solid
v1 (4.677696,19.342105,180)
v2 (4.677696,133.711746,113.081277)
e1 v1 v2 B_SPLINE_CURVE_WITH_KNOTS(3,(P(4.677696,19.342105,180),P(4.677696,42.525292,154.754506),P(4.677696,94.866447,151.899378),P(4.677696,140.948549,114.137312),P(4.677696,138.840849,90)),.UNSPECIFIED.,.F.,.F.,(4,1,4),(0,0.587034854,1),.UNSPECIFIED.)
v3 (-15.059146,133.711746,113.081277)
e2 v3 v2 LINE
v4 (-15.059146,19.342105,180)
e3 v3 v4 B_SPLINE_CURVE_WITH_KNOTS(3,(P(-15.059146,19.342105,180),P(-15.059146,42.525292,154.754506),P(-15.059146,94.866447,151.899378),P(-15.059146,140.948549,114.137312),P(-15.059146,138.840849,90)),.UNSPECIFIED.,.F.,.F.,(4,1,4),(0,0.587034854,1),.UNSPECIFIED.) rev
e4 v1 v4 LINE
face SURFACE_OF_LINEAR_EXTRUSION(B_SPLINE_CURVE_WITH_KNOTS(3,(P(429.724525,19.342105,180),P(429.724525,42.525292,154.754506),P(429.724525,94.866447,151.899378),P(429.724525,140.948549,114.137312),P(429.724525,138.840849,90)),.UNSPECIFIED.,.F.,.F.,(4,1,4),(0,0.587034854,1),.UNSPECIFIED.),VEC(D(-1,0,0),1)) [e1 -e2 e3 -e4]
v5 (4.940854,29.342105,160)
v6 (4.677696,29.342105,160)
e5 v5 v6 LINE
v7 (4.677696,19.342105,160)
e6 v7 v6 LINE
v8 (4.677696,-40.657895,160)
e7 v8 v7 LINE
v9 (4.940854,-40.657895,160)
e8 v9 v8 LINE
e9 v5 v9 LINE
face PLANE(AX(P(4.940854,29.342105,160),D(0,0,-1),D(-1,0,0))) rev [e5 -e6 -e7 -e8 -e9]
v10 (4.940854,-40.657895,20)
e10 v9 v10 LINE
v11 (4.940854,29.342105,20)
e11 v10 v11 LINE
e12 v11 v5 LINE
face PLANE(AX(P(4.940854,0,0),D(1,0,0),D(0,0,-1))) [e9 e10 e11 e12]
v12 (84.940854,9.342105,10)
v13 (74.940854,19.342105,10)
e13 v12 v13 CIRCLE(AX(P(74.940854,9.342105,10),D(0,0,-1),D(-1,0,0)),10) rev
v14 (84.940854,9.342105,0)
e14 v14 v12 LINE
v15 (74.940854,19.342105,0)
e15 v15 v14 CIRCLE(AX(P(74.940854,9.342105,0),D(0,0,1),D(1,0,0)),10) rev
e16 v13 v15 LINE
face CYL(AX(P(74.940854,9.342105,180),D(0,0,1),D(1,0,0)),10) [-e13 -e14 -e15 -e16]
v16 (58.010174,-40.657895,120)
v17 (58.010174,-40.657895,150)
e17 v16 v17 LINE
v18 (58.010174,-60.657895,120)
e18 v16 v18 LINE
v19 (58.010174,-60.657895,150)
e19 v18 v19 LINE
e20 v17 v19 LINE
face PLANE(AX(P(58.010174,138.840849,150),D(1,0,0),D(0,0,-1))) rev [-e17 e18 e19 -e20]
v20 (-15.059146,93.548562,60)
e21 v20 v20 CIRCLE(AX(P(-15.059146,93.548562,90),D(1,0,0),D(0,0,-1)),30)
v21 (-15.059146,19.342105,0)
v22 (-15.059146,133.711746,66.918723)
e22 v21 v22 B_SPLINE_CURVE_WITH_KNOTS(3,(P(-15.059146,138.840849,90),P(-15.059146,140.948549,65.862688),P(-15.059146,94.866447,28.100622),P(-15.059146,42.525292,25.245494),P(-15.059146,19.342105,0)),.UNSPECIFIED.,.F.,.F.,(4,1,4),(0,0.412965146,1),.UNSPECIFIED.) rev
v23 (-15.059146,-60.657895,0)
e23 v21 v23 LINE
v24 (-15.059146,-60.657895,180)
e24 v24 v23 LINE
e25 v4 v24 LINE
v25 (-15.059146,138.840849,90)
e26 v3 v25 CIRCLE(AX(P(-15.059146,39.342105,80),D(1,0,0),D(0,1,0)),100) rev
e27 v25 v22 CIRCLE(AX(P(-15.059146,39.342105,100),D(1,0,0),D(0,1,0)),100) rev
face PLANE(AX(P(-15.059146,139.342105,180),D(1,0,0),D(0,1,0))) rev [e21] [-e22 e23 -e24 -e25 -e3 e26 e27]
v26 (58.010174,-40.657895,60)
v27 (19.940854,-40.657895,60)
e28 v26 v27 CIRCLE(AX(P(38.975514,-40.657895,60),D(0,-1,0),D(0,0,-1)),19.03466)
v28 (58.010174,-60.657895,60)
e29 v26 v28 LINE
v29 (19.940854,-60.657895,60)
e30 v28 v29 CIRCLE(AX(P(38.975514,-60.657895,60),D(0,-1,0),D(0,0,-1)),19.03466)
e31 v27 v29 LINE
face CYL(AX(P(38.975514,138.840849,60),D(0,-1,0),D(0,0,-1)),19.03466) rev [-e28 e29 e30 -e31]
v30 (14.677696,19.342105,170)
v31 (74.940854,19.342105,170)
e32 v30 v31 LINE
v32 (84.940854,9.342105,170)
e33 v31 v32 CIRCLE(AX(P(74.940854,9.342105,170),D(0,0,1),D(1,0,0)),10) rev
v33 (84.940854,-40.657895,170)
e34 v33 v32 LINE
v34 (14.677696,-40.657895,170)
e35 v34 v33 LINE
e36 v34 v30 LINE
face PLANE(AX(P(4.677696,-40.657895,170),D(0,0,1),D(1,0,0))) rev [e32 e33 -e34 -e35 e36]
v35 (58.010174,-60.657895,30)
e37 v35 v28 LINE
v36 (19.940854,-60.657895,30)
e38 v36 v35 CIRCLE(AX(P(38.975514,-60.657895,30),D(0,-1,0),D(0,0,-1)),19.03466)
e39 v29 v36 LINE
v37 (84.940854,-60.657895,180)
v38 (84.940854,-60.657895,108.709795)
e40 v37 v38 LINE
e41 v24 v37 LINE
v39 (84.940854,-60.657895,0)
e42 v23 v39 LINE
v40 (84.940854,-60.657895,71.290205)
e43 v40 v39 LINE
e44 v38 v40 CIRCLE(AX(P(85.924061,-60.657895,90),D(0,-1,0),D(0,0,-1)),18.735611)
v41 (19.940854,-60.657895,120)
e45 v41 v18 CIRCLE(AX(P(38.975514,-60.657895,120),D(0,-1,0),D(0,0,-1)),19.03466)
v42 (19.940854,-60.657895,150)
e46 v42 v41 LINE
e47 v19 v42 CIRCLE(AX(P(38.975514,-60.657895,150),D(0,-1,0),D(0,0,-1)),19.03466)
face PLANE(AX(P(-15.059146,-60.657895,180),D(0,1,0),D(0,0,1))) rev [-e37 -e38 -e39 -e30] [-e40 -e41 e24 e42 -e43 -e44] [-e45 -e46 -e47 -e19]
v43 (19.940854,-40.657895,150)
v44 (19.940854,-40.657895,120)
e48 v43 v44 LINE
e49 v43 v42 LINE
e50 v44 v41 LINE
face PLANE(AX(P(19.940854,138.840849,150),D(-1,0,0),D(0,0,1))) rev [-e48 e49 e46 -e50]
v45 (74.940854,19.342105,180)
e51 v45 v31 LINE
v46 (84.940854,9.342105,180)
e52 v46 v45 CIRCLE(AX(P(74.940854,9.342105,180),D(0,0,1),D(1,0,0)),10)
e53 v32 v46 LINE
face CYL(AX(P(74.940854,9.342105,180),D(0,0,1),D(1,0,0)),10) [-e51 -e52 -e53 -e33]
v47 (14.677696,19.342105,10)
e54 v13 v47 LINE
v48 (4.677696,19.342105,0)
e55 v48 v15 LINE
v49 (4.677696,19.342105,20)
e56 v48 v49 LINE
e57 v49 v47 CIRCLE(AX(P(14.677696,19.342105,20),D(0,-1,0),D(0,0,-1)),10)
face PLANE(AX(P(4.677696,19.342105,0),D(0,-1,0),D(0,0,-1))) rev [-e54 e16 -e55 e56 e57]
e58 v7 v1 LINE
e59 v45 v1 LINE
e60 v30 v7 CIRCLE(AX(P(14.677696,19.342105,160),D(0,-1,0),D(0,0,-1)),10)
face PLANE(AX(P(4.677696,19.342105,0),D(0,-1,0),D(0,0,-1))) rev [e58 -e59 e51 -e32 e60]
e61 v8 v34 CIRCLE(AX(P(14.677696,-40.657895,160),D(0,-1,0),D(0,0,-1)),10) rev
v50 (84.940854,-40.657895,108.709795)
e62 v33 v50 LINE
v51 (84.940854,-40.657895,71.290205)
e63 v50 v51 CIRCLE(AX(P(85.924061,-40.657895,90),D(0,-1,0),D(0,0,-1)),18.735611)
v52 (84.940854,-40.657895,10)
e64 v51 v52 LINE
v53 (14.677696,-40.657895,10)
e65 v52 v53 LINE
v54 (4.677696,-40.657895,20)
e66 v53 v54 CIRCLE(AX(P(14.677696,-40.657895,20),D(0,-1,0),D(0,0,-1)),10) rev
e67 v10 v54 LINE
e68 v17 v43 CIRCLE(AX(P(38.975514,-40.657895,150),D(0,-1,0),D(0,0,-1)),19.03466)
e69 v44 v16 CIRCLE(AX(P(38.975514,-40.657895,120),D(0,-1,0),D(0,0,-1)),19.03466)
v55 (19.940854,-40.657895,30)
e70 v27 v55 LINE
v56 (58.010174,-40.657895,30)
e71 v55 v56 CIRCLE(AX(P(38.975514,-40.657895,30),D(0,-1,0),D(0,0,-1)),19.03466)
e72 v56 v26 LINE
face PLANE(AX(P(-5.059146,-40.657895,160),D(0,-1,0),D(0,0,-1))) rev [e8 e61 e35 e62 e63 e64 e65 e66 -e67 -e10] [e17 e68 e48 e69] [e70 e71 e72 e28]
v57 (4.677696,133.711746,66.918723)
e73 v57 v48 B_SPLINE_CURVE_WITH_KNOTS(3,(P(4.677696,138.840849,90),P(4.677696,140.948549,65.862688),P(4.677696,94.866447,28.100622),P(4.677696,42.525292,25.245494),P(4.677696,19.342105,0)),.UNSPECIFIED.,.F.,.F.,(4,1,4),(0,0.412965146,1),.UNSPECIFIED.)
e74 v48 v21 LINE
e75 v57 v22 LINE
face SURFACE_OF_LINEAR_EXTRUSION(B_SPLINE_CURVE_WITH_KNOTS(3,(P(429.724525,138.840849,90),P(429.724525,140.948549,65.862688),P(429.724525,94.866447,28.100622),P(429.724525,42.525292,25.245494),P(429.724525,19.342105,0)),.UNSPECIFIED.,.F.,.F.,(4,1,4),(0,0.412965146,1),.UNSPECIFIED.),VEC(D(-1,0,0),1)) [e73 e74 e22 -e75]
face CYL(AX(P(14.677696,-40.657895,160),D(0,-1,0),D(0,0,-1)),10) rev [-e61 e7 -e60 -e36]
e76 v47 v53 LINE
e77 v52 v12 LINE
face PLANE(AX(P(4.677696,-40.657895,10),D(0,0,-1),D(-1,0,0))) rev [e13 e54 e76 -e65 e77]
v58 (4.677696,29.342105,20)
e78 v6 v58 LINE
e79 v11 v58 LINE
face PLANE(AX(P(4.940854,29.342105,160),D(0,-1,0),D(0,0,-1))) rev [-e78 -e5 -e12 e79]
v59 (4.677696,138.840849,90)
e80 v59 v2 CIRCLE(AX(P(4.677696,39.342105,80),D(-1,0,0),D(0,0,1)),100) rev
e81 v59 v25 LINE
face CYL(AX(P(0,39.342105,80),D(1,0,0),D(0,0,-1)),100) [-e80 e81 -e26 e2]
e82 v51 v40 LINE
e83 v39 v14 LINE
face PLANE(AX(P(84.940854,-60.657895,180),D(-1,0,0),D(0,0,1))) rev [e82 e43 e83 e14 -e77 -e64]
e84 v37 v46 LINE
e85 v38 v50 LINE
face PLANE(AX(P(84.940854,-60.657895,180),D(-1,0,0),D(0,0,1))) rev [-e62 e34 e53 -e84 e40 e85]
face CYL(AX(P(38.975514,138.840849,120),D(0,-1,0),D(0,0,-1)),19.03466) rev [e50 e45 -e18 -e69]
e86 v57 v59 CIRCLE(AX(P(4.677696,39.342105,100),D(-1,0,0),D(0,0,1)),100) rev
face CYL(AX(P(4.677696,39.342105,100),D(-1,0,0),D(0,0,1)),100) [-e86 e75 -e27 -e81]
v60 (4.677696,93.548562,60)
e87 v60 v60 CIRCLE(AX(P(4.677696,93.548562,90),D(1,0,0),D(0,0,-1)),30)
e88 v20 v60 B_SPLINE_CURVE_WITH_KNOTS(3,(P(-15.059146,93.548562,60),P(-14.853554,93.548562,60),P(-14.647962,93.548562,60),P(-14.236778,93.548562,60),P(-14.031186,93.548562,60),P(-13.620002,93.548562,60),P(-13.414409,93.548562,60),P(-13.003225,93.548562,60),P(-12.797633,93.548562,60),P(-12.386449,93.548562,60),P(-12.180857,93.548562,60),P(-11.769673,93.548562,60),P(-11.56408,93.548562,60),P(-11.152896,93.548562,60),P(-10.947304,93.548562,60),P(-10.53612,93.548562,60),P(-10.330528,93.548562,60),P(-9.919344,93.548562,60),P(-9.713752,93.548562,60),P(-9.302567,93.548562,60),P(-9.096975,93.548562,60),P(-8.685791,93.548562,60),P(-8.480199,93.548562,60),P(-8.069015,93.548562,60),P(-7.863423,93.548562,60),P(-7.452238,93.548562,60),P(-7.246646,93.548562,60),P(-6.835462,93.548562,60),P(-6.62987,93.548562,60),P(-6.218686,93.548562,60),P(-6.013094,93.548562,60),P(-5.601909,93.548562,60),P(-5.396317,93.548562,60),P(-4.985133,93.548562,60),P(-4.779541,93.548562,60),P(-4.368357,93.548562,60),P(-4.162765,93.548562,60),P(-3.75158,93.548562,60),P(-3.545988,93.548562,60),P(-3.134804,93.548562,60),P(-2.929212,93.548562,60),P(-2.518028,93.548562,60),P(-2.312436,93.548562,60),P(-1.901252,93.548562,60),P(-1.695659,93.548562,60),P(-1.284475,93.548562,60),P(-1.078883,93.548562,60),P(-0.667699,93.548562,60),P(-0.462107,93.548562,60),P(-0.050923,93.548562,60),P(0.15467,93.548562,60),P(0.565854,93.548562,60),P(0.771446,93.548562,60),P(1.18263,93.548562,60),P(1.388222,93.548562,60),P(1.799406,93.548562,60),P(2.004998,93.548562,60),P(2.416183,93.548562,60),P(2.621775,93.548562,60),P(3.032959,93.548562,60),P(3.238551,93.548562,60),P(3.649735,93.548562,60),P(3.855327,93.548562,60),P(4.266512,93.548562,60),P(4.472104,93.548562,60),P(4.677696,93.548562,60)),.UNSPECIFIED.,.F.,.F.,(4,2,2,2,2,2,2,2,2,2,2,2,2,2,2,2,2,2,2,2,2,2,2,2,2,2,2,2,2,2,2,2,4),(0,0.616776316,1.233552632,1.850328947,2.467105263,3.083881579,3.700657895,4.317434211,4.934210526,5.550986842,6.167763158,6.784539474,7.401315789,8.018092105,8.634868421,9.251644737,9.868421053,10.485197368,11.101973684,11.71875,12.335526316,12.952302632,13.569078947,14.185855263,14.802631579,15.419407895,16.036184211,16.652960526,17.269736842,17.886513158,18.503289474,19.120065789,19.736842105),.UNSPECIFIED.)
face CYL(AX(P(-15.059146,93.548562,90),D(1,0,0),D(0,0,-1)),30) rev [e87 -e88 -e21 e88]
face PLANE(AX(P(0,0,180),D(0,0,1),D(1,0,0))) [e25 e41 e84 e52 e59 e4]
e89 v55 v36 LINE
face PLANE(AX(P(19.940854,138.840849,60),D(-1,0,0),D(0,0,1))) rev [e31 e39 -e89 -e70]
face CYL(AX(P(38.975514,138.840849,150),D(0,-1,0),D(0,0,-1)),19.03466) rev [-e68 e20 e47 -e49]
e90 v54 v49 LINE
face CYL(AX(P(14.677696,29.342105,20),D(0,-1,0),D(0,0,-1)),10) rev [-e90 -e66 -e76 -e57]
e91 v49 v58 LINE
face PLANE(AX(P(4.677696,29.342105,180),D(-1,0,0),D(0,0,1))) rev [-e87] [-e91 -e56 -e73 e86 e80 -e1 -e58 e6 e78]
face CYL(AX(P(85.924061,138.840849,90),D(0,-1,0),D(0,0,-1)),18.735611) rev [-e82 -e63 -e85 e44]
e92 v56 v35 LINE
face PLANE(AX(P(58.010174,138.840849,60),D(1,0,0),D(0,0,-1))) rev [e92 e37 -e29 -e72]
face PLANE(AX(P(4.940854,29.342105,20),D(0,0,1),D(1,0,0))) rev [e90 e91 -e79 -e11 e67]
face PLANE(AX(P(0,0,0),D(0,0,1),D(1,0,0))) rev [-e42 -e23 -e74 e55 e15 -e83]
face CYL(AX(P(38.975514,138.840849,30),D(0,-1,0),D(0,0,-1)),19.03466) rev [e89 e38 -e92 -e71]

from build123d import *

# Parameters (mm, degrees)
SALIENTE_EXTRUIR1_DEPTH     = 180
REDONDEO1_R                 = 100
REDONDEO2_R                 = 10
CROQUIS2_W                  = 140
CROQUIS2_H                  = 70
CORTAR_EXTRUIR4_DEPTH       = 90
CROQUIS3_R                  = 30
CORTAR_EXTRUIR5_DEPTH       = 242.078733734
CORTAR_EXTRUIR6_DEPTH       = 282.806134391
CROQUIS5_W                  = 80.263157895
CROQUIS5_H                  = 10
CORTAR_EXTRUIR8_DEPTH       = 70
CROQUIS6_W                  = 80.263157895
CROQUIS6_H                  = 10
CORTAR_EXTRUIR9_DEPTH       = 243.676183384
REDONDEO8_R                 = 10
CORTAR_EXTRUIR10_DEPTH      = 242.078733734
CORTAR_EXTRUIR10_DEPTH_BACK = 242.078733734
CROQUIS8_W                  = 140
CROQUIS8_H                  = 70
SALIENTE_EXTRUIR2_DEPTH     = 10
CROQUIS9_R                  = 18.735611047
CORTAR_EXTRUIR11_DEPTH      = 282.806134525
REDONDEO9_R                 = 10


# Some blends are built 0.0001 mm under size
with BuildPart() as part:
    # Croquis1 → Saliente-Extruir1 (new body)
    with BuildSketch(Plane.XY):
        Polygon((-15.059146237, -60.657894737), (84.940853763, -60.657894737), (84.940853763, 29.342105263), (4.677695868, 29.342105263), (4.677695868, 139.342105263), (-15.059146237, 139.342105263), align=None)
    extrude(amount=SALIENTE_EXTRUIR1_DEPTH)

    # Redondeo1
    # the kernel refuses this fillet: 100 mm, written as the material it takes off along each edge
    with BuildSketch(Plane(origin=(254.677695868, 139.342105263, 180), x_dir=(0, 0, -1), z_dir=(-1, 0, 0))) as redondeo1_piece_1:
        with BuildLine():
            CenterArc((REDONDEO1_R, REDONDEO1_R), REDONDEO1_R, 180, 90)
            Line((0, REDONDEO1_R), (0, 0))
            Line((0, 0), (REDONDEO1_R, 0))
        make_face()
    extrude(amount=519.736842105, mode=Mode.SUBTRACT)
    with BuildSketch(Plane(origin=(254.677695868, 139.342105263, 0), x_dir=(0, 0, 1), z_dir=(-1, 0, 0))) as redondeo1_piece_2:
        with BuildLine():
            CenterArc((REDONDEO1_R, -REDONDEO1_R), REDONDEO1_R, 90, 90)
            Line((0, -REDONDEO1_R), (0, 0))
            Line((0, 0), (REDONDEO1_R, 0))
        make_face()
    extrude(amount=519.736842105, mode=Mode.SUBTRACT)

    # Redondeo2
    redondeo2_edges = [part.edges().sort_by_distance(p)[0] for p in [
        (44.809274816, 29.342105263, 180),
        (44.809274816, 29.342105263, 0),
    ]]
    fillet(redondeo2_edges, radius=REDONDEO2_R)

    # Croquis2 → Cortar-Extruir4 (cut)
    with BuildSketch(Plane(origin=(84.940853763, 0, 0), x_dir=(0, 0, -1), z_dir=(1, 0, 0))):
        with Locations((-90, -5.657894737)):
            Rectangle(CROQUIS2_W, CROQUIS2_H)
    extrude(amount=-CORTAR_EXTRUIR4_DEPTH, mode=Mode.SUBTRACT)

    # Croquis3 → Cortar-Extruir5 (cut, through all)
    with BuildSketch(Plane(origin=(4.677695868, 0, 0), x_dir=(0, 0, -1), z_dir=(1, 0, 0))):
        with Locations((-90, 93.548562432)):
            Circle(CROQUIS3_R)
    extrude(amount=-CORTAR_EXTRUIR5_DEPTH, mode=Mode.SUBTRACT)

    # Croquis4 → Cortar-Extruir6 (cut, through all)
    with BuildSketch(Plane(origin=(0, -60.657894737, 0), x_dir=(-1, 0, 0), z_dir=(0, -1, 0))):
        with BuildLine():
            Line((-58.010173511, -150), (-58.010173511, -120))
            ThreePointArc((-58.010173511, -120), (-38.975513637, -100.965340126), (-19.940853763, -120))
            Line((-19.940853763, -120), (-19.940853763, -150))
            ThreePointArc((-19.940853763, -150), (-38.975513637, -169.034659874), (-58.010173511, -150))
        make_face()
        with BuildLine():
            Line((-58.010173511, -60), (-58.010173511, -30))
            ThreePointArc((-58.010173511, -30), (-38.975513637, -10.965340126), (-19.940853763, -30))
            Line((-19.940853763, -30), (-19.940853763, -60))
            ThreePointArc((-19.940853763, -60), (-38.975513637, -79.034659874), (-58.010173511, -60))
        make_face()
    extrude(amount=-CORTAR_EXTRUIR6_DEPTH, mode=Mode.SUBTRACT)

    # Croquis5 → Cortar-Extruir8 (cut)
    with BuildSketch(Plane(origin=(0, 29.342105263, 0), x_dir=(1, 0, 0), z_dir=(0, 1, 0))):
        with Locations((44.809274816, -15)):
            Rectangle(CROQUIS5_W, CROQUIS5_H)
        with Locations((44.809274816, -165)):
            Rectangle(CROQUIS5_W, CROQUIS5_H)
    extrude(amount=-CORTAR_EXTRUIR8_DEPTH, mode=Mode.SUBTRACT)

    # Croquis6 → Cortar-Extruir9 (cut, through all)
    with BuildSketch(Plane.XY.offset(180)):
        with Locations((44.809274816, 24.342105263)):
            Rectangle(CROQUIS6_W, CROQUIS6_H)
    extrude(amount=-CORTAR_EXTRUIR9_DEPTH, mode=Mode.SUBTRACT)

    # Redondeo8
    redondeo8_edges = [part.edges().sort_by_distance(p)[0] for p in [
        (84.940853763, 19.342105263, 175),
        (84.940853763, 19.342105263, 5),
    ]]
    fillet(redondeo8_edges, radius=REDONDEO8_R)

    # Croquis7 → Cortar-Extruir10 (cut, two sides: drawn at the far end of the back side and taken through both)
    with BuildSketch(Plane(origin=(4.677695868, 0, 0), x_dir=(0, 0, -1), z_dir=(1, 0, 0)).offset(-CORTAR_EXTRUIR10_DEPTH_BACK)):
        with BuildLine():
            add(Edge.make_bspline(
                [(-113.081277055, 133.711746083), (-124.698414262, 126.957224262), (-152.328432442, 87.000878261), (-154.754506131, 42.525291557), (-180, 19.342105263)],
                knots=[0.150275034, 0.150275034, 0.150275034, 0.150275034, 0.412965146, 1, 1, 1, 1], degree=3))
            ThreePointArc((-113.081277055, 133.711746083), (-161.572445426, 97.186172783), (-180, 39.342105263))
            Line((-180, 39.342105263), (-180, 19.342105263))
        make_face()
        with BuildLine():
            ThreePointArc((0, 39.342105263), (-18.427554574, 97.186172783), (-66.918722945, 133.711746083))
            add(Edge.make_bspline(
                [(-66.918722945, 133.711746083), (-55.301585738, 126.957224262), (-27.671567558, 87.000878261), (-25.245493869, 42.525291557), (0, 19.342105263)],
                knots=[0.150275034, 0.150275034, 0.150275034, 0.150275034, 0.412965146, 1, 1, 1, 1], degree=3))
            Line((0, 19.342105263), (0, 39.342105263))
        make_face()
    extrude(amount=CORTAR_EXTRUIR10_DEPTH + CORTAR_EXTRUIR10_DEPTH_BACK, mode=Mode.SUBTRACT)

    # Croquis8 → Saliente-Extruir2 (add)
    with BuildSketch(Plane(origin=(-5.059146237, 0, 0), x_dir=(0, 0, -1), z_dir=(1, 0, 0))):
        with Locations((-90, -5.657894737)):
            Rectangle(CROQUIS8_W, CROQUIS8_H)
    extrude(amount=SALIENTE_EXTRUIR2_DEPTH)

    # Croquis9 → Cortar-Extruir11 (cut, through all)
    with BuildSketch(Plane.XZ.offset(60.657894737)):
        with Locations((85.924060677, 90)):
            Circle(CROQUIS9_R)
    extrude(amount=-CORTAR_EXTRUIR11_DEPTH, mode=Mode.SUBTRACT)

    # Redondeo9
    redondeo9_edges = [part.edges().sort_by_distance(p)[0] for p in [
        (4.677695868, -10.657894737, 170),
        (4.677695868, -10.657894737, 10),
    ]]
    fillet(redondeo9_edges, radius=REDONDEO9_R - 0.0001)  # a hair under: the kernel refuses the full size


solid = part.part
